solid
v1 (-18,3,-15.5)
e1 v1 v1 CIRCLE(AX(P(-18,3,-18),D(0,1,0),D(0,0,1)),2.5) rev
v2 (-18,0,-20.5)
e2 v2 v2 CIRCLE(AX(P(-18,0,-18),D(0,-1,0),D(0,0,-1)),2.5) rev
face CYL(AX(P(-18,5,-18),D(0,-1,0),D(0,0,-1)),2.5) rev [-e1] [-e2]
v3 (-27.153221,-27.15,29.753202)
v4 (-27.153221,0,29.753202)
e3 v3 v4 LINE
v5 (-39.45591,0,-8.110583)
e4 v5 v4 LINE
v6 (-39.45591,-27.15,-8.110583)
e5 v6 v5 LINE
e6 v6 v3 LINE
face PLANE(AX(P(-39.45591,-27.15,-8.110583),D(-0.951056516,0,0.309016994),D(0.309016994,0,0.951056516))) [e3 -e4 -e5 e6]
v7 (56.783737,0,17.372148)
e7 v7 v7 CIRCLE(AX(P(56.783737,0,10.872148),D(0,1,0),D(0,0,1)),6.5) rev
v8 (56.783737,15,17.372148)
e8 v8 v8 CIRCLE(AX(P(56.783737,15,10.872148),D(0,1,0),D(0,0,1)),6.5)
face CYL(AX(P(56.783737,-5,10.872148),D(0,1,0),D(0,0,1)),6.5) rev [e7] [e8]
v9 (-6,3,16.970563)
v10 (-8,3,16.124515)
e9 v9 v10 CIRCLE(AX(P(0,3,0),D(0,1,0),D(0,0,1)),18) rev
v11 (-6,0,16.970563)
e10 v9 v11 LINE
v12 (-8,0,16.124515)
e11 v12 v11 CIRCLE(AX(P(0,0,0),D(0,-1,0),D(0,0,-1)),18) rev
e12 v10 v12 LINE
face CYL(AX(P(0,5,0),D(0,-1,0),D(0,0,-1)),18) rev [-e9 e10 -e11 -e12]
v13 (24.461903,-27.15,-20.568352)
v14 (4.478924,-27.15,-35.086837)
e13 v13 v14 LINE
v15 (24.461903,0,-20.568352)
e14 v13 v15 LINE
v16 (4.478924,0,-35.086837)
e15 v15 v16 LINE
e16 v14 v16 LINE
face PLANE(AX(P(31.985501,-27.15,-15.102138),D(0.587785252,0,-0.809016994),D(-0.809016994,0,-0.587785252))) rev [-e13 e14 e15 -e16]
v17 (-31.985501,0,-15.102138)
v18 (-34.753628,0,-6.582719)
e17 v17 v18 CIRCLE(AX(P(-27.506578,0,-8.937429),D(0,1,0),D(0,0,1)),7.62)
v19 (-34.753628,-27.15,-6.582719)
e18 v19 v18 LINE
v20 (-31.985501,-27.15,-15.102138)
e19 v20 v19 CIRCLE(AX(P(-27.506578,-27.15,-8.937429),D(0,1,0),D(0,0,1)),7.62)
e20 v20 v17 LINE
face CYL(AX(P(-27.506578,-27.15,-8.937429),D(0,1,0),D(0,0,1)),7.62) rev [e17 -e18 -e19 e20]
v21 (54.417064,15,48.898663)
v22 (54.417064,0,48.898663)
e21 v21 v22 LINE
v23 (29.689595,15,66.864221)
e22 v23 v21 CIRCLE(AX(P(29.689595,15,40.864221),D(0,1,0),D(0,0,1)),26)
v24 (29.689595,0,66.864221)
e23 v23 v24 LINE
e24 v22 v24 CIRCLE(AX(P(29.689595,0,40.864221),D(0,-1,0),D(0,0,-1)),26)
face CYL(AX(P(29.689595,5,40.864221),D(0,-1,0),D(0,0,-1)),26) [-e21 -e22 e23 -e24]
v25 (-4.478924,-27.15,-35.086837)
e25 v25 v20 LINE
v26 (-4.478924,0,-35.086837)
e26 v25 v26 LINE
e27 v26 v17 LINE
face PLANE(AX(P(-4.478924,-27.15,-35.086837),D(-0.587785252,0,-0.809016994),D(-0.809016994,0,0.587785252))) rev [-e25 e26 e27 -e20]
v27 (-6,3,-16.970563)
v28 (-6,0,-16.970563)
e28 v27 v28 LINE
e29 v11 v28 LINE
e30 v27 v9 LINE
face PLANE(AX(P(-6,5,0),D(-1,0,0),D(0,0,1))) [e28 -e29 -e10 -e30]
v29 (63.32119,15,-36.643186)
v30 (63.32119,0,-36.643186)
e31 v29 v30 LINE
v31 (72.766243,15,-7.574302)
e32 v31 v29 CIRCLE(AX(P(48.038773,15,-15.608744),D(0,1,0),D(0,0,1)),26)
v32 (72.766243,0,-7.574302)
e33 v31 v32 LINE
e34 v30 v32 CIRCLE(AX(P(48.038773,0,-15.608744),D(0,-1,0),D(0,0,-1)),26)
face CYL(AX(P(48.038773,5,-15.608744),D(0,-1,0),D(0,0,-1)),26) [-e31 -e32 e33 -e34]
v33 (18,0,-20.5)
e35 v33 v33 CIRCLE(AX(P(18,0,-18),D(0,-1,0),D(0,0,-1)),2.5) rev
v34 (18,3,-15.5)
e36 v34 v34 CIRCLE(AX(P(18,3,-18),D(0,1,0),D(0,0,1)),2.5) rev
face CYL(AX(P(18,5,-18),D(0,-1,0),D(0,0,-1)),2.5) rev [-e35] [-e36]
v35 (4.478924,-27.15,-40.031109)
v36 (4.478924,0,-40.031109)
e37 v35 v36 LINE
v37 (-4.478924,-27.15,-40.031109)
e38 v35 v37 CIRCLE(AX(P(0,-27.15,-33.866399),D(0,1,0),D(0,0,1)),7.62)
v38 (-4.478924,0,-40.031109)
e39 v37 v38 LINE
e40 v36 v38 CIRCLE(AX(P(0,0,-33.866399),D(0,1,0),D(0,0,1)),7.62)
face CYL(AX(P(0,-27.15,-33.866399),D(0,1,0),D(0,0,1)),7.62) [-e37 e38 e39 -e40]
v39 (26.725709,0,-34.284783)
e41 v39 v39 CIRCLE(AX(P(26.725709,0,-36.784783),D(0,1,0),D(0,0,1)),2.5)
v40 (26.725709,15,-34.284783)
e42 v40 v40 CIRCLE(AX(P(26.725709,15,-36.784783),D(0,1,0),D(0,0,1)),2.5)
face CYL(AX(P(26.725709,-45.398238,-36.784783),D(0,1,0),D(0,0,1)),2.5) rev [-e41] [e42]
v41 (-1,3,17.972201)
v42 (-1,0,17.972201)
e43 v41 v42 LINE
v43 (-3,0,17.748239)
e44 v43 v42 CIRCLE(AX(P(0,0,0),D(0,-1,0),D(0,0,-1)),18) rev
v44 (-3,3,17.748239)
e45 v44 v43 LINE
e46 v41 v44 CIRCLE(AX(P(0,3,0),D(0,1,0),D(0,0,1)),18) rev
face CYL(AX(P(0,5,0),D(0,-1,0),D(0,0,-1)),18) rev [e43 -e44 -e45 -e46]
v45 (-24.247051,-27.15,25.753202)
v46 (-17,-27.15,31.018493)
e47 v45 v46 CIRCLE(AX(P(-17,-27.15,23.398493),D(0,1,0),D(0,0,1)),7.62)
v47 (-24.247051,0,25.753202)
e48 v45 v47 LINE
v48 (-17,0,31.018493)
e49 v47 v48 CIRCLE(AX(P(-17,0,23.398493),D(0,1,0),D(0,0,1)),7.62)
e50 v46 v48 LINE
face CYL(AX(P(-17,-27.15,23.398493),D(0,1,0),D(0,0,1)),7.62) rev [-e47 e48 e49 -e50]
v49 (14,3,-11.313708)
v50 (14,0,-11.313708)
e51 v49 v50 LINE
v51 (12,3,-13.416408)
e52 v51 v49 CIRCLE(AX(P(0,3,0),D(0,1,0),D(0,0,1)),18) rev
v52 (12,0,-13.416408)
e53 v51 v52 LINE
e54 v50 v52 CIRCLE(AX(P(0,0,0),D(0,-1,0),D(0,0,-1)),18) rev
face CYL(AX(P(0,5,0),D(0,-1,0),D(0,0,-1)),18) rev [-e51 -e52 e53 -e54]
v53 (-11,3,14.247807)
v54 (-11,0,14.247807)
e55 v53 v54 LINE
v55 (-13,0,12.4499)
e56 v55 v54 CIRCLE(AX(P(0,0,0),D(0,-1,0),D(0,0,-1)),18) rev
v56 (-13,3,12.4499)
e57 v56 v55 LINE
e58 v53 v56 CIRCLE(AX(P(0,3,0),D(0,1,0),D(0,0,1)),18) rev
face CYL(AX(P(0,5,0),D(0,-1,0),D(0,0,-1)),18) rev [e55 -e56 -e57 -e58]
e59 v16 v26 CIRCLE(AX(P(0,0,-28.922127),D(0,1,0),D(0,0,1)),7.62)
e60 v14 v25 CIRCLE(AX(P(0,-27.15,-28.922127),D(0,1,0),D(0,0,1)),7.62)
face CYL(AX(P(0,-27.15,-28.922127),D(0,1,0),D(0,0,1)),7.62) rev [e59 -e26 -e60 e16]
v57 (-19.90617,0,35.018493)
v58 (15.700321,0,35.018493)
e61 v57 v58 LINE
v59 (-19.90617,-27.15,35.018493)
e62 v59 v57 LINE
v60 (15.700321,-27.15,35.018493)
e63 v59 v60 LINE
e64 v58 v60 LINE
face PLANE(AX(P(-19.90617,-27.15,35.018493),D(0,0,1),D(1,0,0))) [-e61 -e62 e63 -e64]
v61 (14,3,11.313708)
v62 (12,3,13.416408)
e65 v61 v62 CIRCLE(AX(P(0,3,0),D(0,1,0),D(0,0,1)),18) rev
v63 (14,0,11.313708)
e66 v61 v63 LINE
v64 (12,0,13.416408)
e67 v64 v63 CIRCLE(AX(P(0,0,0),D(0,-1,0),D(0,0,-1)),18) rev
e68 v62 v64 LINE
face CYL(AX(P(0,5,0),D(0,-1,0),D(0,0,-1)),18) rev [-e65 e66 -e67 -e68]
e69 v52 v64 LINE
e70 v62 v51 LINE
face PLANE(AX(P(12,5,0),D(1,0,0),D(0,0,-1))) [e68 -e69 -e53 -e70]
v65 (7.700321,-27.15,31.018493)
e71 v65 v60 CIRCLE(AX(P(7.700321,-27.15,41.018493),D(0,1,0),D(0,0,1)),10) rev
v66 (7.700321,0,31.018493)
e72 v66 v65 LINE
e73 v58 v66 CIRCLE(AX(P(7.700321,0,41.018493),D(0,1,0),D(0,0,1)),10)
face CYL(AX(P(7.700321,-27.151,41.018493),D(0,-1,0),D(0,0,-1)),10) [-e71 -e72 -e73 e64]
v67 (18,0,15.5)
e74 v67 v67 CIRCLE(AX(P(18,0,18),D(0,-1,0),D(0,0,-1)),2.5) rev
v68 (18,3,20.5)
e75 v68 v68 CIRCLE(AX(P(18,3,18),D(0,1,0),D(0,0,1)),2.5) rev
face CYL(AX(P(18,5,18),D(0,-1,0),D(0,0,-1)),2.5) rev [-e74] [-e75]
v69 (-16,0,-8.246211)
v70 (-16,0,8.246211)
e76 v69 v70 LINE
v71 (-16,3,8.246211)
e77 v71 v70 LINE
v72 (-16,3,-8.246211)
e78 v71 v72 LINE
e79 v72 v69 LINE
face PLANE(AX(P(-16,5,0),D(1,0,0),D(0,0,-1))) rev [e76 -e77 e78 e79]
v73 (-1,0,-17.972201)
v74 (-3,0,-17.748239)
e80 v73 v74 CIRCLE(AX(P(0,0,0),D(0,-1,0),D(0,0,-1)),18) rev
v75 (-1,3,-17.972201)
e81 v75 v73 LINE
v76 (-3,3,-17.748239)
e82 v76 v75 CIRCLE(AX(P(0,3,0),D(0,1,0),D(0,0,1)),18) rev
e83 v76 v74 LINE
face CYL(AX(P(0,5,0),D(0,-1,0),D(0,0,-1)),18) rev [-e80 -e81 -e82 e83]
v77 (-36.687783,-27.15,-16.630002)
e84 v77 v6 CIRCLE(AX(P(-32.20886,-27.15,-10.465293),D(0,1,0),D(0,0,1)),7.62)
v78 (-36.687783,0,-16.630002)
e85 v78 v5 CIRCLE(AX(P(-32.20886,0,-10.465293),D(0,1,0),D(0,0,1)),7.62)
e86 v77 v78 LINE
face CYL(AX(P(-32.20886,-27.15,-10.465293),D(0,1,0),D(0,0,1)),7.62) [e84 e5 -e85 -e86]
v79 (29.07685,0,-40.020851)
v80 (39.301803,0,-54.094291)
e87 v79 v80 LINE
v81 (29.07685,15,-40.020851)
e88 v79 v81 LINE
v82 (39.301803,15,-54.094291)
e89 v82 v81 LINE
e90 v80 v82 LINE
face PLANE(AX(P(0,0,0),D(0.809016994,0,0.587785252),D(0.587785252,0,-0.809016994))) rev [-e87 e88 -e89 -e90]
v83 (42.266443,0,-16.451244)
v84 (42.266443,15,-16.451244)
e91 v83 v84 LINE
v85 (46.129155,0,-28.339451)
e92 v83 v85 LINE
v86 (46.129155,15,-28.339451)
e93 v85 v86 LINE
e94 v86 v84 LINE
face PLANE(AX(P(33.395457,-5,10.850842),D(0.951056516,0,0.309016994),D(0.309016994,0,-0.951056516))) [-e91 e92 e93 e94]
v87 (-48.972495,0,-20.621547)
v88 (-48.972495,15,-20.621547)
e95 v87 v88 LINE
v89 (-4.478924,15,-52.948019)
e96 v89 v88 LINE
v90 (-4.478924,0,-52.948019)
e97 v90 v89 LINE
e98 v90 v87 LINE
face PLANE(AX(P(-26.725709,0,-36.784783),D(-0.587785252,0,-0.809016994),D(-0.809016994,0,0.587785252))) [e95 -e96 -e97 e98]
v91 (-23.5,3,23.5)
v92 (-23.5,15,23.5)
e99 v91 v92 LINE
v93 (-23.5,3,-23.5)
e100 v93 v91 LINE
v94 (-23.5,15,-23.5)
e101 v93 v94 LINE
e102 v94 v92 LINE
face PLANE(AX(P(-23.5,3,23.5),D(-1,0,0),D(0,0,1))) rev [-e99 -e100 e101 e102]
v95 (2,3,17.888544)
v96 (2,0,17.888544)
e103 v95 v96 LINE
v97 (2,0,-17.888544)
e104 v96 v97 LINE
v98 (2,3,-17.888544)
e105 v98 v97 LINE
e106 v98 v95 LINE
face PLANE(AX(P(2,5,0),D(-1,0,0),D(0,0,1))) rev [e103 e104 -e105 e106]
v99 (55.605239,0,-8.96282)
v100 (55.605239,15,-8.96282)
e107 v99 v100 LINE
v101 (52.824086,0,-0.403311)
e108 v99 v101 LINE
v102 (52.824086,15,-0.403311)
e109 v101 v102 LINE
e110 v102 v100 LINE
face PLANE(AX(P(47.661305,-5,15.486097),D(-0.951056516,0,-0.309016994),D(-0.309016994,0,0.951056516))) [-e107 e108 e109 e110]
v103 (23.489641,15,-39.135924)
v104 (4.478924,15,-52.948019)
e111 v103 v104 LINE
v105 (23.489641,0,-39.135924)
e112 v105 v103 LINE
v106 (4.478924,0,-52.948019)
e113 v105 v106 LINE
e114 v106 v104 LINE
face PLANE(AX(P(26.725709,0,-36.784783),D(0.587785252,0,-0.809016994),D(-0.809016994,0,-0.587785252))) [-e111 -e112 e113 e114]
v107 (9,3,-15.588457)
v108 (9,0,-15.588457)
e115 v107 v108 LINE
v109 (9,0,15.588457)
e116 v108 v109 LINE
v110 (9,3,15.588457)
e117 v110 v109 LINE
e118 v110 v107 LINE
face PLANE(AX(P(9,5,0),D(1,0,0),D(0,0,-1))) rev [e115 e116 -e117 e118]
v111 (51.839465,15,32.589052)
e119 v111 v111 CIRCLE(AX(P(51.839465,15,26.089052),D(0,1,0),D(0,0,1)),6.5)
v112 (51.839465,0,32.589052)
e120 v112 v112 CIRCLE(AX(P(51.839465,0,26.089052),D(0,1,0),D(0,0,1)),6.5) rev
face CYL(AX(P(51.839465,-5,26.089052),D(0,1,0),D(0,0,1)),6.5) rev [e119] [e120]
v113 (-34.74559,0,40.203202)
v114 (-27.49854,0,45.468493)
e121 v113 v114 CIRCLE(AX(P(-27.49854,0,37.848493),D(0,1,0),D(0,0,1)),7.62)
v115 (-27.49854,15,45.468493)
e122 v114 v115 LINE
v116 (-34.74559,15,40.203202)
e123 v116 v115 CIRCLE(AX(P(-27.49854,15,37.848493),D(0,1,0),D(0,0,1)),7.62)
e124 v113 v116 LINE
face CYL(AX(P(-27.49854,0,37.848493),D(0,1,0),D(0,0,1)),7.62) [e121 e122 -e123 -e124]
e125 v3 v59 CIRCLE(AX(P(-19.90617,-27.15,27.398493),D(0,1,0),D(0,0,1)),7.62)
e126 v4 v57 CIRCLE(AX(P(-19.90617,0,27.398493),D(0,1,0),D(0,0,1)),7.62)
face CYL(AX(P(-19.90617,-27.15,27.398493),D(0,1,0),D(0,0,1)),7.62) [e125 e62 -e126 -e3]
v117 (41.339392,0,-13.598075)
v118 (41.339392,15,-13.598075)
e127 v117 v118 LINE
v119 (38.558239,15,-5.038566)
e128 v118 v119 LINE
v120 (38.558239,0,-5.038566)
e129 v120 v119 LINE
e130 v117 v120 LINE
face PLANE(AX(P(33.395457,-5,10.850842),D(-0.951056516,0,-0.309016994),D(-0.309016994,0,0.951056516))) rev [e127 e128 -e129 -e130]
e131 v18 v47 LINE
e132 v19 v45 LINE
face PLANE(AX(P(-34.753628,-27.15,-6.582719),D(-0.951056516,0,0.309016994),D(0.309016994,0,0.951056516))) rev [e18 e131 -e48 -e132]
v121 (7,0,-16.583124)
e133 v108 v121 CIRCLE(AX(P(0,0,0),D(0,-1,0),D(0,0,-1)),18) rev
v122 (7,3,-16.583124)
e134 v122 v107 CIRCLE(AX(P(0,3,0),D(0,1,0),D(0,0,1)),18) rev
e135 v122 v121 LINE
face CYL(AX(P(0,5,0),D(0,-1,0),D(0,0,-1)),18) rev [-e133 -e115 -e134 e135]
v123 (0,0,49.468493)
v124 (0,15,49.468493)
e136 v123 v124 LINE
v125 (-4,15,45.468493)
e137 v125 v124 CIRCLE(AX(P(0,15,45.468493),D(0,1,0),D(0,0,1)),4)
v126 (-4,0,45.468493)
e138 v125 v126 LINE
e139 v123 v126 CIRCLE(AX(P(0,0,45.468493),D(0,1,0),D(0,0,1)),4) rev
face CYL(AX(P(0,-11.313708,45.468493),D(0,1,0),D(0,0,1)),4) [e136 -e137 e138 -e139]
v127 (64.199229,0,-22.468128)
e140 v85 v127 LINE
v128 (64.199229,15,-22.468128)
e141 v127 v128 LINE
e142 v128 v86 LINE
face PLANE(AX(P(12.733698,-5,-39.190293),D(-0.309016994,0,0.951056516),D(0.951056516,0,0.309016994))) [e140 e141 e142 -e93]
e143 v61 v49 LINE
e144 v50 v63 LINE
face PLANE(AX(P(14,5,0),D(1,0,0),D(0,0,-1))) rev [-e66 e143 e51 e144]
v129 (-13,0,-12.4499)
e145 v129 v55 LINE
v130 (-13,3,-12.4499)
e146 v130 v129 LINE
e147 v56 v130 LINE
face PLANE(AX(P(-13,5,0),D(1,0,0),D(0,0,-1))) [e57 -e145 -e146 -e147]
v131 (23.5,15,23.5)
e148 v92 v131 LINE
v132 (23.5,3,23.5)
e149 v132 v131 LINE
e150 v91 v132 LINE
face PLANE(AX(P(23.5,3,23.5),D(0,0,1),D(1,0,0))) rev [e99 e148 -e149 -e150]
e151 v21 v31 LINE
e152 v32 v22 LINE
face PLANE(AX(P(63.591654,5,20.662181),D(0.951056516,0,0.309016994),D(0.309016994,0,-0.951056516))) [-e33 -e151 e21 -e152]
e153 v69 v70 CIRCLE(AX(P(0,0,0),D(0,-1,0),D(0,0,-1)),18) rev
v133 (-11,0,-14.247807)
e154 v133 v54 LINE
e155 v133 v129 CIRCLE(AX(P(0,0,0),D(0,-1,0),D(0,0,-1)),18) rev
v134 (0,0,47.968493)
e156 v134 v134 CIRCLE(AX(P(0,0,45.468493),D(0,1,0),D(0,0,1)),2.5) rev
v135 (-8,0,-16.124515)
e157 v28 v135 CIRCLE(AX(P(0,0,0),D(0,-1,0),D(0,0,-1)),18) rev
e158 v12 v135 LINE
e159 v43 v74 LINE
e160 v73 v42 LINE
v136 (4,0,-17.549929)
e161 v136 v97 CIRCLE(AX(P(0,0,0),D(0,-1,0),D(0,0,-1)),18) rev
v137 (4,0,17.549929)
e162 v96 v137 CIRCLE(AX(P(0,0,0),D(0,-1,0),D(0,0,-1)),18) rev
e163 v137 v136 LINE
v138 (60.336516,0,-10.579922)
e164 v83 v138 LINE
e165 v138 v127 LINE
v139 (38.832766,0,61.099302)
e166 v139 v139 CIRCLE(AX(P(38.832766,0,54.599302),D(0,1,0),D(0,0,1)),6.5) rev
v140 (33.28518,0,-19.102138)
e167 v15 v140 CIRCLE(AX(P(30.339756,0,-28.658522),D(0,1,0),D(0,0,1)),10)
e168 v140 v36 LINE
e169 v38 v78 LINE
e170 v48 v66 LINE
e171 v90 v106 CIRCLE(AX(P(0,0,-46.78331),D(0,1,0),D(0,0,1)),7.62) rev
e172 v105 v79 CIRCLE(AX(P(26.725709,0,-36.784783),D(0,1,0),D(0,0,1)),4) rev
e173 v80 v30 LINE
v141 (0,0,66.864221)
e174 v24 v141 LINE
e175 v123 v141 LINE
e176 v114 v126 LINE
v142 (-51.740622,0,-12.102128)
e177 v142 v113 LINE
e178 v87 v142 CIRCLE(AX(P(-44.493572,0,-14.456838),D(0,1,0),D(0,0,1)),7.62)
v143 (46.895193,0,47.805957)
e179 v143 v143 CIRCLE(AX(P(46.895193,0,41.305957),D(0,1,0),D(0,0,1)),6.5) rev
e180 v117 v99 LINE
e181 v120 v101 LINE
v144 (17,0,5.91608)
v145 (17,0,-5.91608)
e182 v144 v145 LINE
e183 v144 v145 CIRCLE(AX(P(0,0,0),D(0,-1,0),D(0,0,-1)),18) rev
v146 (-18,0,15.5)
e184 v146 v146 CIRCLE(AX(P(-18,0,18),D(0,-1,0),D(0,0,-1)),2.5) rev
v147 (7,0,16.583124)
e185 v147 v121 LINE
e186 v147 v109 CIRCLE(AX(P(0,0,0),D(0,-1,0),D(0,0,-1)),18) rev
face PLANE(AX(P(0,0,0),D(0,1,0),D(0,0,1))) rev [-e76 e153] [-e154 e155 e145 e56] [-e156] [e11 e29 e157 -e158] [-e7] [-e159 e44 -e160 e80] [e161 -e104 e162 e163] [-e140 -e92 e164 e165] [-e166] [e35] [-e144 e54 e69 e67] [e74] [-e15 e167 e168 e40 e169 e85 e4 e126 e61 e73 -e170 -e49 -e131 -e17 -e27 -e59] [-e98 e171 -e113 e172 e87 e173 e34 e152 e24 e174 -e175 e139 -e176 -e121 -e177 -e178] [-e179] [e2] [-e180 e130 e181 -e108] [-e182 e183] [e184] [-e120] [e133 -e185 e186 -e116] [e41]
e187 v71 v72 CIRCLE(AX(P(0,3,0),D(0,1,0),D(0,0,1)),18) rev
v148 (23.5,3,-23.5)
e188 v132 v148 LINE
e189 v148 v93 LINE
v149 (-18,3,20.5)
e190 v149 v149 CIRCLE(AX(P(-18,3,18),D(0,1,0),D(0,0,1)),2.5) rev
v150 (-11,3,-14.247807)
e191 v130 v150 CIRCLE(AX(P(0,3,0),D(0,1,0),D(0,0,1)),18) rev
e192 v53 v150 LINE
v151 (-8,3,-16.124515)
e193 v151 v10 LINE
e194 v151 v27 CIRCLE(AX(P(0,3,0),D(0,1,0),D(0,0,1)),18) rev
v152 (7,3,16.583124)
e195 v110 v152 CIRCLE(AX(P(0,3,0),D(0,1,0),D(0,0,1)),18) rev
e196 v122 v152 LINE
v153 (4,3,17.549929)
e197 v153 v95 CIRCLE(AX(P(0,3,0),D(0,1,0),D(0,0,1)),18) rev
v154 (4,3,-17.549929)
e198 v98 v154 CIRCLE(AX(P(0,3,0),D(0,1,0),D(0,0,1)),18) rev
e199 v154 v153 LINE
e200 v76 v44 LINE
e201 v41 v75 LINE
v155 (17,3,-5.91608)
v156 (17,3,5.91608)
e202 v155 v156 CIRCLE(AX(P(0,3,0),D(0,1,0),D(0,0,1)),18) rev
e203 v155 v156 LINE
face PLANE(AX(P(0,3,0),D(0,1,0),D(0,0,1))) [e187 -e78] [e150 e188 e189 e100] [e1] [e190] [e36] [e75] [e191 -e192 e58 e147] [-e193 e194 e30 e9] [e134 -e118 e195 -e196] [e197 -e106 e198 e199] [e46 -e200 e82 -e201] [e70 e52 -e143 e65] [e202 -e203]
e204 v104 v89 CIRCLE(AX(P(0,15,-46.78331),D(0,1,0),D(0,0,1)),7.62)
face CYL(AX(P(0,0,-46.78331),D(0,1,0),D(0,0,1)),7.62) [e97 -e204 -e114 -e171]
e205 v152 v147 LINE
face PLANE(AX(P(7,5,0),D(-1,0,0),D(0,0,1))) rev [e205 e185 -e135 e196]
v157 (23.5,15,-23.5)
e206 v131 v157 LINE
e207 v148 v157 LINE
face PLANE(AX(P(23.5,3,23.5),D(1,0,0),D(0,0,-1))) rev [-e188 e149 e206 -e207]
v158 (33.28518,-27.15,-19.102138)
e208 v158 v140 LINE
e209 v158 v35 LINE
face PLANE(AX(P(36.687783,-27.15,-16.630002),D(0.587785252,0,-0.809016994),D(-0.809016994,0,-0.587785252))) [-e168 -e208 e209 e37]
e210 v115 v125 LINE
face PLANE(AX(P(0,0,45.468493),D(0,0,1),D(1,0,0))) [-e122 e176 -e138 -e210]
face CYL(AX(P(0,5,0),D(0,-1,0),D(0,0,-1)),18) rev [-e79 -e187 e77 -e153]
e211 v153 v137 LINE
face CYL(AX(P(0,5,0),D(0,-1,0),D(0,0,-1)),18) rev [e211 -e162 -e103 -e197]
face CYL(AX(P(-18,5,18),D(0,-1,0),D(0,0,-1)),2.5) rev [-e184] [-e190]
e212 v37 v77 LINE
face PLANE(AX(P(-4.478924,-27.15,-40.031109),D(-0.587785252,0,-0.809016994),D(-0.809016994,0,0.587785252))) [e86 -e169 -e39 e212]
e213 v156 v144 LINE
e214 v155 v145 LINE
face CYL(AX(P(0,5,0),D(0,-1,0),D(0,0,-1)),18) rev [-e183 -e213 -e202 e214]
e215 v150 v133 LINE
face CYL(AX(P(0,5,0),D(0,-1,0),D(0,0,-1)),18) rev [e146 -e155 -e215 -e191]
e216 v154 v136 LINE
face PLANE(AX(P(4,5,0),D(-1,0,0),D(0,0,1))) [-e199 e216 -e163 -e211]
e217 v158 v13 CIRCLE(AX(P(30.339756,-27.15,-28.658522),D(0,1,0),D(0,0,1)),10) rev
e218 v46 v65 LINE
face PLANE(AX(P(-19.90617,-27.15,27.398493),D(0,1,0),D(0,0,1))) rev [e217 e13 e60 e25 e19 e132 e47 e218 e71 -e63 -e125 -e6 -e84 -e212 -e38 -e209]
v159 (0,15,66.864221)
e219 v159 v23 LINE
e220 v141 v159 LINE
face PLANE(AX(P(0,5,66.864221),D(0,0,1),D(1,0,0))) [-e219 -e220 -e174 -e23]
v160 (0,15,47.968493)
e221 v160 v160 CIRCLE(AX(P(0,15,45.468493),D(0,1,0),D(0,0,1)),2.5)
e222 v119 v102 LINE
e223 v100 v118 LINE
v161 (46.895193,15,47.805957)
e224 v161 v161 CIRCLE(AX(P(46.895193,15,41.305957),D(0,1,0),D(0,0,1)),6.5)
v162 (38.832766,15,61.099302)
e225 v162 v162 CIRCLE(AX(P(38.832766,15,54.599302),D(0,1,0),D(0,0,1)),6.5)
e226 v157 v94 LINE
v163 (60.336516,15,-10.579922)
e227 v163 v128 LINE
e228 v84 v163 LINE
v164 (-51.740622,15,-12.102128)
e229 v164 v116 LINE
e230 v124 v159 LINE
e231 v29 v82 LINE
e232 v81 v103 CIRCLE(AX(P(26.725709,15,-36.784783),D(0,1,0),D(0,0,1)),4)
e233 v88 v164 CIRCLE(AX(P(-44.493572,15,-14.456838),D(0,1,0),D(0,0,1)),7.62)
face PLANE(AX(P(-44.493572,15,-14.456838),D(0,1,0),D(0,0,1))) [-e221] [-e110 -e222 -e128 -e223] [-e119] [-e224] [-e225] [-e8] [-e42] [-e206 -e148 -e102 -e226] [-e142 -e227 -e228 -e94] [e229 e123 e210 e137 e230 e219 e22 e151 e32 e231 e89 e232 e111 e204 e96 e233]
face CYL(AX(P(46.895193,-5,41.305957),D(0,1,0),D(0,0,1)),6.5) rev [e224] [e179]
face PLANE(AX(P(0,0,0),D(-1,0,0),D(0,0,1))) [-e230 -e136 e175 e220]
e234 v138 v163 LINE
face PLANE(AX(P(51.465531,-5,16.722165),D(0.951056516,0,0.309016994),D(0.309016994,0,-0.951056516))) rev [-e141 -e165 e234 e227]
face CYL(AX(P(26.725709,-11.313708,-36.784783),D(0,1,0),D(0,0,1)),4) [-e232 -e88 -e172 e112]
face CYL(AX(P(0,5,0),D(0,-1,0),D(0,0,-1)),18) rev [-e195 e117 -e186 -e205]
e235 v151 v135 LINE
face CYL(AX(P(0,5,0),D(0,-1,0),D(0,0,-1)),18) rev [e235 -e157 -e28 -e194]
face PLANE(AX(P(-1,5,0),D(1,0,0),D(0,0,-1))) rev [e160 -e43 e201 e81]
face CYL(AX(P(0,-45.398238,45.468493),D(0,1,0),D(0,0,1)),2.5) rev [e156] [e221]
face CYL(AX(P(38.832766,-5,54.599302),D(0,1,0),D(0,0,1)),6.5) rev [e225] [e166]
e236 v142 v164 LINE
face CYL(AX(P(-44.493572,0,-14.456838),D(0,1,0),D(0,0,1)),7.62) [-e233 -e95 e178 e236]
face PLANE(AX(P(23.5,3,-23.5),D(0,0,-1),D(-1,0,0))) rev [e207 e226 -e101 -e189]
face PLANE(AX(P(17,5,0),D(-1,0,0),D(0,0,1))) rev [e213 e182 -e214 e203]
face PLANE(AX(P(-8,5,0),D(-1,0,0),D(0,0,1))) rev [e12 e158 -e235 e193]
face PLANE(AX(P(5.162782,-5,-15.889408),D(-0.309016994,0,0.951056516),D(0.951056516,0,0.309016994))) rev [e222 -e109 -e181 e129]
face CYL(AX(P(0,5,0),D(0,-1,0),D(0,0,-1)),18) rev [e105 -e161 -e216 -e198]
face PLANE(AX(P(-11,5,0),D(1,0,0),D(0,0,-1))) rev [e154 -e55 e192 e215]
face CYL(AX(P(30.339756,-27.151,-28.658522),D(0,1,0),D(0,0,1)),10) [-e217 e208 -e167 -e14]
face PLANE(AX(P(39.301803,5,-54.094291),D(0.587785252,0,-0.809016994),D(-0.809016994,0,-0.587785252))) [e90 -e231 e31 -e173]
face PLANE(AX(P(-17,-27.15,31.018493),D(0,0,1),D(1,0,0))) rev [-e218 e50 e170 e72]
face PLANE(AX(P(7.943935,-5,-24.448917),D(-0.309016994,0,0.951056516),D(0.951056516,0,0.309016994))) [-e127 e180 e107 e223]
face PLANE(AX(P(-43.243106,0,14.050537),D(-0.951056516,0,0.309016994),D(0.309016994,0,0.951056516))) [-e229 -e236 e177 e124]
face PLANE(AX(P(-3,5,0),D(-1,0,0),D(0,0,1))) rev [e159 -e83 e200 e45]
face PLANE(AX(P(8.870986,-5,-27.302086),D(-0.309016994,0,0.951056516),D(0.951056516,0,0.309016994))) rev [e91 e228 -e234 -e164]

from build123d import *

# Parameters (mm, degrees)
BOSS_EXTRUDE1_DEPTH = 10
BOSS_EXTRUDE2_DEPTH = 5
CUT_EXTRUDE1_DEPTH  = 107.586426403
SKETCH7_R           = 2.5
CUT_EXTRUDE2_DEPTH  = 5
SKETCH6_R           = 4
SKETCH6_R_2         = 2.5
BOSS_EXTRUDE4_DEPTH = 5
SKETCH8_W           = 93.505487076
SKETCH8_H           = 78.321413714
CUT_EXTRUDE3_DEPTH  = 5
BOSS_EXTRUDE5_DEPTH = 32.15
CUT_EXTRUDE4_REACH  = 105.391
FILLET1_R           = 10
SKETCH13_R          = 6.5
CUT_EXTRUDE6_DEPTH  = 10
SKETCH17_W          = 58.231833944
SKETCH17_H          = 55.278794696
BOSS_EXTRUDE6_DEPTH = 5
BOSS_EXTRUDE7_START = 10
SKETCH19_R          = 2.5
SKETCH19_R_2        = 6.5
BOSS_EXTRUDE7_DEPTH = 10
SKETCH24_W          = 47
SKETCH24_H          = 47
CUT_EXTRUDE9_DEPTH  = 12
CUT_EXTRUDE11_DEPTH = 5


with BuildPart() as part:
    # Sketch1 → Boss-Extrude1 (new body)
    with BuildSketch(Plane(origin=(0, 0, 0), x_dir=(1, 0, 0), z_dir=(0, 1, 0))):
        with BuildLine():
            ThreePointArc((-34.753628463, 6.582719409), (-34.753628463, 11.292138403), (-31.985501431, 15.102138403))
            Line((-31.985501431, 15.102138403), (-4.478923622, 35.086836981))
            ThreePointArc((-4.478923622, 35.086836981), (0, 36.542127484), (4.478923622, 35.086836981))
            Line((4.478923622, 35.086836981), (31.985501431, 15.102138403))
            ThreePointArc((31.985501431, 15.102138403), (34.753628463, 11.292138403), (34.753628463, 6.582719409))
            Line((34.753628463, 6.582719409), (24.247050654, -25.753202145))
            ThreePointArc((24.247050654, -25.753202145), (21.478923622, -29.563202145), (17, -31.018492648))
            Line((17, -31.018492648), (-17, -31.018492648))
            ThreePointArc((-17, -31.018492648), (-21.478923622, -29.563202145), (-24.247050654, -25.753202145))
            Line((-24.247050654, -25.753202145), (-34.753628463, 6.582719409))
        make_face()
        with BuildLine():
            Line((-31.015314258, 5.368067493), (-21.936645415, -22.573202145))
            ThreePointArc((-21.936645415, -22.573202145), (-19.168518383, -26.383202145), (-14.689594761, -27.838492648))
            Line((-14.689594761, -27.838492648), (14.689594761, -27.838492648))
            ThreePointArc((14.689594761, -27.838492648), (19.168518383, -26.383202145), (21.936645415, -22.573202145))
            Line((21.936645415, -22.573202145), (31.015314258, 5.368067493))
            ThreePointArc((31.015314258, 5.368067493), (31.015314258, 10.077486487), (28.247187227, 13.887486487))
            Line((28.247187227, 13.887486487), (4.478923622, 31.156140813))
            ThreePointArc((4.478923622, 31.156140813), (0, 32.611431316), (-4.478923622, 31.156140813))
            Line((-4.478923622, 31.156140813), (-28.247187227, 13.887486487))
            ThreePointArc((-28.247187227, 13.887486487), (-31.015314258, 10.077486487), (-31.015314258, 5.368067493))
        make_face(mode=Mode.SUBTRACT)
    extrude(amount=BOSS_EXTRUDE1_DEPTH)

    # Sketch2 → Boss-Extrude2 (add)
    with BuildSketch(Plane.XZ):
        with BuildLine():
            Line((-54.417064185, 48.898663309), (-72.766242859, -7.574301818))
            ThreePointArc((-72.766242859, -7.574301818), (-72.766242859, -23.643185526), (-63.321189995, -36.643185526))
            Line((-63.321189995, -36.643185526), (-15.28241656, -71.54539742))
            ThreePointArc((-15.28241656, -71.54539742), (0, -76.510955566), (15.28241656, -71.54539742))
            Line((15.28241656, -71.54539742), (63.321189995, -36.643185526))
            ThreePointArc((63.321189995, -36.643185526), (72.766242859, -23.643185526), (72.766242859, -7.574301818))
            Line((72.766242859, -7.574301818), (54.417064185, 48.898663309))
            ThreePointArc((54.417064185, 48.898663309), (44.972011321, 61.898663309), (29.689594761, 66.864221455))
            Line((29.689594761, 66.864221455), (-29.689594761, 66.864221455))
            ThreePointArc((-29.689594761, 66.864221455), (-44.972011321, 61.898663309), (-54.417064185, 48.898663309))
        make_face()
    extrude(amount=-BOSS_EXTRUDE2_DEPTH)

    # Sketch4 → Cut-Extrude1 (cut, through all)
    with BuildSketch(Plane(origin=(0, 5, 0), x_dir=(1, 0, 0), z_dir=(0, 1, 0))):
        with BuildLine():
            Line((4.478923622, 52.948019256), (26.725709422, 36.784783261))
            Line((26.725709422, 36.784783261), (39.301803277, 54.094291473))
            Line((39.301803277, 54.094291473), (15.28241656, 71.54539742))
            ThreePointArc((15.28241656, 71.54539742), (0, 76.510955566), (-15.28241656, 71.54539742))
            Line((-15.28241656, 71.54539742), (-63.321189995, 36.643185526))
            ThreePointArc((-63.321189995, 36.643185526), (-72.766242859, 23.643185526), (-72.766242859, 7.574301818))
            Line((-72.766242859, 7.574301818), (-54.417064185, -48.898663309))
            ThreePointArc((-54.417064185, -48.898663309), (-44.972011321, -61.898663309), (-29.689594761, -66.864221455))
            Line((-29.689594761, -66.864221455), (0, -66.864221455))
            Line((0, -66.864221455), (0, -45.468492648))
            Line((0, -45.468492648), (-27.49853953, -45.468492648))
            ThreePointArc((-27.49853953, -45.468492648), (-31.977463152, -44.013202145), (-34.745590184, -40.203202145))
            Line((-34.745590184, -40.203202145), (-51.740622254, 12.102128271))
            ThreePointArc((-51.740622254, 12.102128271), (-51.740622254, 16.811547266), (-48.972495222, 20.621547266))
            Line((-48.972495222, 20.621547266), (-4.478923622, 52.948019256))
            ThreePointArc((-4.478923622, 52.948019256), (0, 54.403309759), (4.478923622, 52.948019256))
        make_face()
    extrude(amount=-CUT_EXTRUDE1_DEPTH, mode=Mode.SUBTRACT)

    # Sketch7 → Cut-Extrude2 (cut)
    with BuildSketch(Plane(origin=(0, 5, 0), x_dir=(1, 0, 0), z_dir=(0, 1, 0))):
        with BuildLine():
            Line((12.806248475, -18.5), (-12.806248475, -18.5))
            ThreePointArc((-12.806248475, -18.5), (0, -22.5), (12.806248475, -18.5))
        make_face()
        with BuildLine():
            ThreePointArc((-19.032866311, -12), (-17.540474197, -14.091904234), (-15.81929202, -16))
            Line((-15.81929202, -16), (15.81929202, -16))
            ThreePointArc((15.81929202, -16), (17.540474197, -14.091904234), (19.032866311, -12))
            Line((19.032866311, -12), (-19.032866311, -12))
        make_face()
        with BuildLine():
            ThreePointArc((-21.817424229, -5.5), (-21.201295804, -7.533595173), (-20.396078054, -9.5))
            Line((-20.396078054, -9.5), (20.396078054, -9.5))
            ThreePointArc((20.396078054, -9.5), (21.201295804, -7.533595173), (21.817424229, -5.5))
            Line((21.817424229, -5.5), (-21.817424229, -5.5))
        make_face()
        with BuildLine():
            ThreePointArc((22.299103121, -3), (22.5, 0), (22.299103121, 3))
            Line((22.299103121, 3), (-22.299103121, 3))
            ThreePointArc((-22.299103121, 3), (-22.5, 0), (-22.299103121, -3))
            Line((-22.299103121, -3), (22.299103121, -3))
        make_face()
        with BuildLine():
            ThreePointArc((12.806248475, 18.5), (0, 22.5), (-12.806248475, 18.5))
            Line((-12.806248475, 18.5), (12.806248475, 18.5))
        make_face()
        with BuildLine():
            Line((-21.817424229, 5.5), (21.817424229, 5.5))
            ThreePointArc((21.817424229, 5.5), (21.201295804, 7.533595173), (20.396078054, 9.5))
            Line((20.396078054, 9.5), (-20.396078054, 9.5))
            ThreePointArc((-20.396078054, 9.5), (-21.201295804, 7.533595173), (-21.817424229, 5.5))
        make_face()
        with BuildLine():
            ThreePointArc((19.032866311, 12), (17.540474197, 14.091904234), (15.81929202, 16))
            Line((15.81929202, 16), (-15.81929202, 16))
            ThreePointArc((-15.81929202, 16), (-17.540474197, 14.091904234), (-19.032866311, 12))
            Line((-19.032866311, 12), (19.032866311, 12))
        make_face()
        with Locations((26.725709422, 36.784783261)):
            Circle(SKETCH7_R)
        with Locations((0, -45.468492648)):
            Circle(SKETCH7_R)
    extrude(amount=-CUT_EXTRUDE2_DEPTH, mode=Mode.SUBTRACT)

    # Sketch6 → Boss-Extrude4 (add)
    # profile 1 of 2: a face of its own
    with BuildSketch(Plane(origin=(0, 5, 0), x_dir=(1, 0, 0), z_dir=(0, 1, 0))):
        with Locations((26.725709422, 36.784783261)):
            Circle(SKETCH6_R)
        with Locations(Location((26.725709422, 36.784783261, 0), (0, 0, 270))):
            Circle(SKETCH6_R_2, mode=Mode.SUBTRACT)
    # profile 2 of 2: a face of its own
    with BuildSketch(Plane(origin=(0, 5, 0), x_dir=(1, 0, 0), z_dir=(0, 1, 0))):
        with Locations((0, -45.468492648)):
            Circle(SKETCH6_R)
        with Locations(Location((0, -45.468492648, 0), (0, 0, 270))):
            Circle(SKETCH6_R_2, mode=Mode.SUBTRACT)
    extrude(amount=-BOSS_EXTRUDE4_DEPTH)

    # Sketch8 → Cut-Extrude3 (cut)
    with BuildSketch(Plane(origin=(0, 10, 0), x_dir=(1, 0, 0), z_dir=(0, 1, 0))):
        Rectangle(SKETCH8_W, SKETCH8_H)
    extrude(amount=-CUT_EXTRUDE3_DEPTH, mode=Mode.SUBTRACT)

    # Sketch9 → Boss-Extrude5 (add)
    with BuildSketch(Plane(origin=(0, 5, 0), x_dir=(1, 0, 0), z_dir=(0, 1, 0))):
        with BuildLine():
            Line((36.68778345, 16.630002448), (4.478923622, 40.031108891))
            ThreePointArc((4.478923622, 40.031108891), (0, 41.486399394), (-4.478923622, 40.031108891))
            Line((-4.478923622, 40.031108891), (-36.68778345, 16.630002448))
            ThreePointArc((-36.68778345, 16.630002448), (-39.455910481, 12.820002448), (-39.455910481, 8.110583454))
            Line((-39.455910481, 8.110583454), (-27.153220766, -29.753202145))
            ThreePointArc((-27.153220766, -29.753202145), (-24.385093734, -33.563202145), (-19.906170112, -35.018492648))
            Line((-19.906170112, -35.018492648), (19.906170112, -35.018492648))
            ThreePointArc((19.906170112, -35.018492648), (24.385093734, -33.563202145), (27.153220766, -29.753202145))
            Line((27.153220766, -29.753202145), (39.455910481, 8.110583454))
            ThreePointArc((39.455910481, 8.110583454), (39.455910481, 12.820002448), (36.68778345, 16.630002448))
        make_face()
        with BuildLine():
            Line((-4.478923622, 35.086836981), (-31.985501431, 15.102138403))
            ThreePointArc((-31.985501431, 15.102138403), (-34.753628463, 11.292138403), (-34.753628463, 6.582719409))
            Line((-34.753628463, 6.582719409), (-24.247050654, -25.753202145))
            ThreePointArc((-24.247050654, -25.753202145), (-21.478923622, -29.563202145), (-17, -31.018492648))
            Line((-17, -31.018492648), (17, -31.018492648))
            ThreePointArc((17, -31.018492648), (21.478923622, -29.563202145), (24.247050654, -25.753202145))
            Line((24.247050654, -25.753202145), (34.753628463, 6.582719409))
            ThreePointArc((34.753628463, 6.582719409), (34.753628463, 11.292138403), (31.985501431, 15.102138403))
            Line((31.985501431, 15.102138403), (4.478923622, 35.086836981))
            ThreePointArc((4.478923622, 35.086836981), (0, 36.542127484), (-4.478923622, 35.086836981))
        make_face(mode=Mode.SUBTRACT)
    extrude(amount=-BOSS_EXTRUDE5_DEPTH)

    # Sketch12 → Cut-Extrude4 (cut, up to next)
    with BuildSketch(Plane.XZ, mode=Mode.PRIVATE) as cut_extrude4_sk1:
        Polygon((35.432126528, -25.709759722), (13.605683662, 41.465124163), (22.841397396, 44.465989464), (44.667840263, -22.708894421), align=None)
    cut_extrude4_tool1 = extrude(cut_extrude4_sk1.sketch, amount=CUT_EXTRUDE4_REACH, mode=Mode.PRIVATE) & part.part
    add(cut_extrude4_tool1.solids().sort_by_distance((29.136762, 0, 9.378115))[0], mode=Mode.SUBTRACT)

    # Fillet1
    # the kernel refuses this fillet: 10 mm, written as the material it takes off along each edge
    with BuildSketch(Plane(origin=(31.985501431, 0, -15.102138403), x_dir=(0.3090169943749442, 0, -0.9510565162951545), z_dir=(0, -1, 0))) as fillet1_piece_1:
        with BuildLine():
            CenterArc((12.38432395, -5.754350164), FILLET1_R, 144.869897646, 53.130102354)
            Line((2.873758787, -8.844520108), (0, 0))
            Line((0, 0), (4.205848897, 0))
        make_face()
    extrude(amount=50.399196962, mode=Mode.SUBTRACT)
    with BuildSketch(Plane(origin=(17, 0, 31.018492648), x_dir=(-0.3090169943749449, 0, 0.9510565162951543), z_dir=(0, -1, 0))) as fillet1_piece_2:
        with BuildLine():
            CenterArc((12.38432395, 5.754350164), FILLET1_R, 162, 53.130102354)
            Line((2.873758787, 8.844520108), (0, 0))
            Line((0, 0), (4.205848897, 0))
        make_face()
    extrude(amount=50.399196962, mode=Mode.SUBTRACT)

    # Sketch13 → Cut-Extrude6 (cut)
    with BuildSketch(Plane(origin=(0, 5, -5), x_dir=(-1, 0, 0), z_dir=(0, -1, 0))):
        Polygon((-38.55823872, 0.038566227), (-41.339391669, 8.598074874), (-55.605239414, 3.962819958), (-52.824086464, -4.596688688), align=None)
        Polygon((-60.336516462, 5.57992153), (-42.266442653, 11.451244423), (-46.129155082, 23.339450876), (-64.199228892, 17.468127983), align=None)
        with Locations(Location((-56.783736792, -15.8721482, 0), (0, 0, 270))):
            Circle(SKETCH13_R)
        with Locations(Location((-51.839464882, -31.089052461, 0), (0, 0, 270))):
            Circle(SKETCH13_R)
        with Locations(Location((-46.895192972, -46.305956722, 0), (0, 0, 270))):
            Circle(SKETCH13_R)
        with Locations(Location((-38.832765548, -59.59930165, 0), (0, 0, 270))):
            Circle(SKETCH13_R)
    extrude(amount=CUT_EXTRUDE6_DEPTH, mode=Mode.SUBTRACT)

    # Sketch17 → Boss-Extrude6 (add)
    with BuildSketch(Plane(origin=(0, 5, 0), x_dir=(1, 0, 0), z_dir=(0, 1, 0))):
        with Locations((-5.052192747, 3)):
            Rectangle(SKETCH17_W, SKETCH17_H)
    extrude(amount=-BOSS_EXTRUDE6_DEPTH)

    # Sketch19 → Boss-Extrude7 (add)
    with BuildSketch(Plane(origin=(0, 5, 0), x_dir=(1, 0, 0), z_dir=(0, 1, 0)).offset(BOSS_EXTRUDE7_START)):
        with BuildLine():
            Line((-51.740622254, 12.102128271), (-34.745590184, -40.203202145))
            ThreePointArc((-34.745590184, -40.203202145), (-31.977463152, -44.013202145), (-27.49853953, -45.468492648))
            Line((-27.49853953, -45.468492648), (-4, -45.468492648))
            ThreePointArc((-4, -45.468492648), (-2.828427125, -48.296919773), (0, -49.468492648))
            Line((0, -49.468492648), (0, -66.864221455))
            Line((0, -66.864221455), (29.689594761, -66.864221455))
            ThreePointArc((29.689594761, -66.864221455), (44.972011321, -61.898663309), (54.417064185, -48.898663309))
            Line((54.417064185, -48.898663309), (72.766242859, 7.574301818))
            ThreePointArc((72.766242859, 7.574301818), (72.766242859, 23.643185526), (63.321189995, 36.643185526))
            Line((63.321189995, 36.643185526), (39.301803277, 54.094291473))
            Line((39.301803277, 54.094291473), (29.076850432, 40.020851238))
            ThreePointArc((29.076850432, 40.020851238), (26.099971562, 40.735536623), (23.489641445, 39.13592427))
            Line((23.489641445, 39.13592427), (4.478923622, 52.948019256))
            ThreePointArc((4.478923622, 52.948019256), (0, 54.403309759), (-4.478923622, 52.948019256))
            Line((-4.478923622, 52.948019256), (-48.972495222, 20.621547266))
            ThreePointArc((-48.972495222, 20.621547266), (-51.740622254, 16.811547266), (-51.740622254, 12.102128271))
        make_face()
        with Locations(Location((26.725709422, 36.784783261, 0), (0, 0, 270))):
            Circle(SKETCH19_R, mode=Mode.SUBTRACT)
        with Locations(Location((0, -45.468492648, 0), (0, 0, 270))):
            Circle(SKETCH19_R, mode=Mode.SUBTRACT)
        with Locations(Location((56.783736792, -10.8721482, 0), (0, 0, 270))):
            Circle(SKETCH19_R_2, mode=Mode.SUBTRACT)
        with Locations(Location((51.839464882, -26.089052461, 0), (0, 0, 270))):
            Circle(SKETCH19_R_2, mode=Mode.SUBTRACT)
        with Locations(Location((46.895192972, -41.305956722, 0), (0, 0, 270))):
            Circle(SKETCH19_R_2, mode=Mode.SUBTRACT)
        with Locations(Location((38.832765548, -54.59930165, 0), (0, 0, 270))):
            Circle(SKETCH19_R_2, mode=Mode.SUBTRACT)
        Polygon((60.336516462, 10.57992153), (64.199228892, 22.468127983), (46.129155082, 28.339450876), (42.266442653, 16.451244423), align=None, mode=Mode.SUBTRACT)
        Polygon((52.824086464, 0.403311312), (55.605239414, 8.962819958), (41.339391669, 13.598074874), (38.55823872, 5.038566227), align=None, mode=Mode.SUBTRACT)
    extrude(amount=-BOSS_EXTRUDE7_DEPTH)

    # Sketch24 → Cut-Extrude9 (cut)
    with BuildSketch(Plane(origin=(0, 15, 0), x_dir=(1, 0, 0), z_dir=(0, 1, 0))):
        Rectangle(SKETCH24_W, SKETCH24_H)
    extrude(amount=-CUT_EXTRUDE9_DEPTH, mode=Mode.SUBTRACT)

    # Sketch20 → Cut-Extrude11 (cut)
    with BuildSketch(Plane(origin=(0, 0, 0), x_dir=(1, 0, 0), z_dir=(0, 1, 0))):
        with BuildLine():
            Line((-16, -8.246211251), (-16, 8.246211251))
            ThreePointArc((-16, 8.246211251), (-17.492855679, 4.242640709), (-18, 4.4e-08))
            ThreePointArc((-18, 4.4e-08), (-17.49285569, -4.242640666), (-16, -8.246211251))
        make_face()
        with BuildLine():
            ThreePointArc((-11, 14.247806849), (-12.033624459, 13.386257221), (-13, 12.449899598))
            Line((-13, 12.449899598), (-13, -12.449899598))
            ThreePointArc((-13, -12.449899598), (-12.033624459, -13.386257221), (-11, -14.247806849))
            Line((-11, -14.247806849), (-11, 14.247806849))
        make_face()
        with BuildLine():
            ThreePointArc((-6, 16.970562748), (-7.012770422, 16.577727559), (-8, 16.124515497))
            Line((-8, 16.124515497), (-8, -16.124515497))
            ThreePointArc((-8, -16.124515497), (-7.012770422, -16.577727559), (-6, -16.970562748))
            Line((-6, -16.970562748), (-6, 16.970562748))
        make_face()
        with BuildLine():
            ThreePointArc((-1, 17.972200756), (-2.003132466, 17.888193322), (-3, 17.748239349))
            Line((-3, 17.748239349), (-3, -17.748239349))
            ThreePointArc((-3, -17.748239349), (-2.003132466, -17.888193322), (-1, -17.972200756))
            Line((-1, -17.972200756), (-1, 17.972200756))
        make_face()
        with BuildLine():
            Line((2, 17.88854382), (2, -17.88854382))
            ThreePointArc((2, -17.88854382), (3.004773708, -17.747431785), (4, -17.549928775))
            Line((4, -17.549928775), (4, 17.549928775))
            ThreePointArc((4, 17.549928775), (3.004773708, 17.747431785), (2, 17.88854382))
        make_face()
        with BuildLine():
            Line((7, 16.583123952), (7, -16.583123952))
            ThreePointArc((7, -16.583123952), (8.015443871, -16.11684397), (9, -15.588457268))
            Line((9, -15.588457268), (9, 15.588457268))
            ThreePointArc((9, 15.588457268), (8.015443871, 16.11684397), (7, 16.583123952))
        make_face()
        with BuildLine():
            Line((14, -11.313708499), (14, 11.313708499))
            ThreePointArc((14, 11.313708499), (13.042443642, 12.405428805), (12, 13.416407865))
            Line((12, 13.416407865), (12, -13.416407865))
            ThreePointArc((12, -13.416407865), (13.042443642, -12.405428805), (14, -11.313708499))
        make_face()
        with BuildLine():
            ThreePointArc((17, -5.916079783), (17.748239349, -3), (18, 0))
            ThreePointArc((18, 0), (17.748239349, 3), (17, 5.916079783))
            Line((17, 5.916079783), (17, -5.916079783))
        make_face()
        with BuildLine():
            ThreePointArc((18, -15.5), (16.232233047, -16.232233047), (15.5, -18))
            Line((15.5, -18), (18, -18))
            Line((18, -18), (18, -15.5))
        make_face()
        with BuildLine():
            Line((18, -18), (15.5, -18))
            ThreePointArc((15.5, -18), (18, -20.5), (20.5, -18))
            ThreePointArc((20.5, -18), (19.767766953, -16.232233047), (18, -15.5))
            Line((18, -15.5), (18, -18))
        make_face()
        with BuildLine():
            ThreePointArc((-15.5, -18), (-16.232233047, -16.232233047), (-18, -15.5))
            Line((-18, -15.5), (-18, -18))
            Line((-18, -18), (-15.5, -18))
        make_face()
        with BuildLine():
            Line((-18, -18), (-18, -15.5))
            ThreePointArc((-18, -15.5), (-19.767766953, -19.767766953), (-15.5, -18))
            Line((-15.5, -18), (-18, -18))
        make_face()
        with BuildLine():
            ThreePointArc((-15.5, 18), (-19.767766953, 19.767766953), (-18, 15.5))
            Line((-18, 15.5), (-18, 18))
            Line((-18, 18), (-15.5, 18))
        make_face()
        with BuildLine():
            Line((-18, 18), (-18, 15.5))
            ThreePointArc((-18, 15.5), (-16.232233047, 16.232233047), (-15.5, 18))
            Line((-15.5, 18), (-18, 18))
        make_face()
        with BuildLine():
            ThreePointArc((20.5, 18), (18, 20.5), (15.5, 18))
            Line((15.5, 18), (18, 18))
            Line((18, 18), (18, 15.5))
            ThreePointArc((18, 15.5), (19.767766953, 16.232233047), (20.5, 18))
        make_face()
        with BuildLine():
            Line((18, 18), (15.5, 18))
            ThreePointArc((15.5, 18), (16.232233047, 16.232233047), (18, 15.5))
            Line((18, 15.5), (18, 18))
        make_face()
    extrude(amount=CUT_EXTRUDE11_DEPTH, mode=Mode.SUBTRACT)


solid = part.part
